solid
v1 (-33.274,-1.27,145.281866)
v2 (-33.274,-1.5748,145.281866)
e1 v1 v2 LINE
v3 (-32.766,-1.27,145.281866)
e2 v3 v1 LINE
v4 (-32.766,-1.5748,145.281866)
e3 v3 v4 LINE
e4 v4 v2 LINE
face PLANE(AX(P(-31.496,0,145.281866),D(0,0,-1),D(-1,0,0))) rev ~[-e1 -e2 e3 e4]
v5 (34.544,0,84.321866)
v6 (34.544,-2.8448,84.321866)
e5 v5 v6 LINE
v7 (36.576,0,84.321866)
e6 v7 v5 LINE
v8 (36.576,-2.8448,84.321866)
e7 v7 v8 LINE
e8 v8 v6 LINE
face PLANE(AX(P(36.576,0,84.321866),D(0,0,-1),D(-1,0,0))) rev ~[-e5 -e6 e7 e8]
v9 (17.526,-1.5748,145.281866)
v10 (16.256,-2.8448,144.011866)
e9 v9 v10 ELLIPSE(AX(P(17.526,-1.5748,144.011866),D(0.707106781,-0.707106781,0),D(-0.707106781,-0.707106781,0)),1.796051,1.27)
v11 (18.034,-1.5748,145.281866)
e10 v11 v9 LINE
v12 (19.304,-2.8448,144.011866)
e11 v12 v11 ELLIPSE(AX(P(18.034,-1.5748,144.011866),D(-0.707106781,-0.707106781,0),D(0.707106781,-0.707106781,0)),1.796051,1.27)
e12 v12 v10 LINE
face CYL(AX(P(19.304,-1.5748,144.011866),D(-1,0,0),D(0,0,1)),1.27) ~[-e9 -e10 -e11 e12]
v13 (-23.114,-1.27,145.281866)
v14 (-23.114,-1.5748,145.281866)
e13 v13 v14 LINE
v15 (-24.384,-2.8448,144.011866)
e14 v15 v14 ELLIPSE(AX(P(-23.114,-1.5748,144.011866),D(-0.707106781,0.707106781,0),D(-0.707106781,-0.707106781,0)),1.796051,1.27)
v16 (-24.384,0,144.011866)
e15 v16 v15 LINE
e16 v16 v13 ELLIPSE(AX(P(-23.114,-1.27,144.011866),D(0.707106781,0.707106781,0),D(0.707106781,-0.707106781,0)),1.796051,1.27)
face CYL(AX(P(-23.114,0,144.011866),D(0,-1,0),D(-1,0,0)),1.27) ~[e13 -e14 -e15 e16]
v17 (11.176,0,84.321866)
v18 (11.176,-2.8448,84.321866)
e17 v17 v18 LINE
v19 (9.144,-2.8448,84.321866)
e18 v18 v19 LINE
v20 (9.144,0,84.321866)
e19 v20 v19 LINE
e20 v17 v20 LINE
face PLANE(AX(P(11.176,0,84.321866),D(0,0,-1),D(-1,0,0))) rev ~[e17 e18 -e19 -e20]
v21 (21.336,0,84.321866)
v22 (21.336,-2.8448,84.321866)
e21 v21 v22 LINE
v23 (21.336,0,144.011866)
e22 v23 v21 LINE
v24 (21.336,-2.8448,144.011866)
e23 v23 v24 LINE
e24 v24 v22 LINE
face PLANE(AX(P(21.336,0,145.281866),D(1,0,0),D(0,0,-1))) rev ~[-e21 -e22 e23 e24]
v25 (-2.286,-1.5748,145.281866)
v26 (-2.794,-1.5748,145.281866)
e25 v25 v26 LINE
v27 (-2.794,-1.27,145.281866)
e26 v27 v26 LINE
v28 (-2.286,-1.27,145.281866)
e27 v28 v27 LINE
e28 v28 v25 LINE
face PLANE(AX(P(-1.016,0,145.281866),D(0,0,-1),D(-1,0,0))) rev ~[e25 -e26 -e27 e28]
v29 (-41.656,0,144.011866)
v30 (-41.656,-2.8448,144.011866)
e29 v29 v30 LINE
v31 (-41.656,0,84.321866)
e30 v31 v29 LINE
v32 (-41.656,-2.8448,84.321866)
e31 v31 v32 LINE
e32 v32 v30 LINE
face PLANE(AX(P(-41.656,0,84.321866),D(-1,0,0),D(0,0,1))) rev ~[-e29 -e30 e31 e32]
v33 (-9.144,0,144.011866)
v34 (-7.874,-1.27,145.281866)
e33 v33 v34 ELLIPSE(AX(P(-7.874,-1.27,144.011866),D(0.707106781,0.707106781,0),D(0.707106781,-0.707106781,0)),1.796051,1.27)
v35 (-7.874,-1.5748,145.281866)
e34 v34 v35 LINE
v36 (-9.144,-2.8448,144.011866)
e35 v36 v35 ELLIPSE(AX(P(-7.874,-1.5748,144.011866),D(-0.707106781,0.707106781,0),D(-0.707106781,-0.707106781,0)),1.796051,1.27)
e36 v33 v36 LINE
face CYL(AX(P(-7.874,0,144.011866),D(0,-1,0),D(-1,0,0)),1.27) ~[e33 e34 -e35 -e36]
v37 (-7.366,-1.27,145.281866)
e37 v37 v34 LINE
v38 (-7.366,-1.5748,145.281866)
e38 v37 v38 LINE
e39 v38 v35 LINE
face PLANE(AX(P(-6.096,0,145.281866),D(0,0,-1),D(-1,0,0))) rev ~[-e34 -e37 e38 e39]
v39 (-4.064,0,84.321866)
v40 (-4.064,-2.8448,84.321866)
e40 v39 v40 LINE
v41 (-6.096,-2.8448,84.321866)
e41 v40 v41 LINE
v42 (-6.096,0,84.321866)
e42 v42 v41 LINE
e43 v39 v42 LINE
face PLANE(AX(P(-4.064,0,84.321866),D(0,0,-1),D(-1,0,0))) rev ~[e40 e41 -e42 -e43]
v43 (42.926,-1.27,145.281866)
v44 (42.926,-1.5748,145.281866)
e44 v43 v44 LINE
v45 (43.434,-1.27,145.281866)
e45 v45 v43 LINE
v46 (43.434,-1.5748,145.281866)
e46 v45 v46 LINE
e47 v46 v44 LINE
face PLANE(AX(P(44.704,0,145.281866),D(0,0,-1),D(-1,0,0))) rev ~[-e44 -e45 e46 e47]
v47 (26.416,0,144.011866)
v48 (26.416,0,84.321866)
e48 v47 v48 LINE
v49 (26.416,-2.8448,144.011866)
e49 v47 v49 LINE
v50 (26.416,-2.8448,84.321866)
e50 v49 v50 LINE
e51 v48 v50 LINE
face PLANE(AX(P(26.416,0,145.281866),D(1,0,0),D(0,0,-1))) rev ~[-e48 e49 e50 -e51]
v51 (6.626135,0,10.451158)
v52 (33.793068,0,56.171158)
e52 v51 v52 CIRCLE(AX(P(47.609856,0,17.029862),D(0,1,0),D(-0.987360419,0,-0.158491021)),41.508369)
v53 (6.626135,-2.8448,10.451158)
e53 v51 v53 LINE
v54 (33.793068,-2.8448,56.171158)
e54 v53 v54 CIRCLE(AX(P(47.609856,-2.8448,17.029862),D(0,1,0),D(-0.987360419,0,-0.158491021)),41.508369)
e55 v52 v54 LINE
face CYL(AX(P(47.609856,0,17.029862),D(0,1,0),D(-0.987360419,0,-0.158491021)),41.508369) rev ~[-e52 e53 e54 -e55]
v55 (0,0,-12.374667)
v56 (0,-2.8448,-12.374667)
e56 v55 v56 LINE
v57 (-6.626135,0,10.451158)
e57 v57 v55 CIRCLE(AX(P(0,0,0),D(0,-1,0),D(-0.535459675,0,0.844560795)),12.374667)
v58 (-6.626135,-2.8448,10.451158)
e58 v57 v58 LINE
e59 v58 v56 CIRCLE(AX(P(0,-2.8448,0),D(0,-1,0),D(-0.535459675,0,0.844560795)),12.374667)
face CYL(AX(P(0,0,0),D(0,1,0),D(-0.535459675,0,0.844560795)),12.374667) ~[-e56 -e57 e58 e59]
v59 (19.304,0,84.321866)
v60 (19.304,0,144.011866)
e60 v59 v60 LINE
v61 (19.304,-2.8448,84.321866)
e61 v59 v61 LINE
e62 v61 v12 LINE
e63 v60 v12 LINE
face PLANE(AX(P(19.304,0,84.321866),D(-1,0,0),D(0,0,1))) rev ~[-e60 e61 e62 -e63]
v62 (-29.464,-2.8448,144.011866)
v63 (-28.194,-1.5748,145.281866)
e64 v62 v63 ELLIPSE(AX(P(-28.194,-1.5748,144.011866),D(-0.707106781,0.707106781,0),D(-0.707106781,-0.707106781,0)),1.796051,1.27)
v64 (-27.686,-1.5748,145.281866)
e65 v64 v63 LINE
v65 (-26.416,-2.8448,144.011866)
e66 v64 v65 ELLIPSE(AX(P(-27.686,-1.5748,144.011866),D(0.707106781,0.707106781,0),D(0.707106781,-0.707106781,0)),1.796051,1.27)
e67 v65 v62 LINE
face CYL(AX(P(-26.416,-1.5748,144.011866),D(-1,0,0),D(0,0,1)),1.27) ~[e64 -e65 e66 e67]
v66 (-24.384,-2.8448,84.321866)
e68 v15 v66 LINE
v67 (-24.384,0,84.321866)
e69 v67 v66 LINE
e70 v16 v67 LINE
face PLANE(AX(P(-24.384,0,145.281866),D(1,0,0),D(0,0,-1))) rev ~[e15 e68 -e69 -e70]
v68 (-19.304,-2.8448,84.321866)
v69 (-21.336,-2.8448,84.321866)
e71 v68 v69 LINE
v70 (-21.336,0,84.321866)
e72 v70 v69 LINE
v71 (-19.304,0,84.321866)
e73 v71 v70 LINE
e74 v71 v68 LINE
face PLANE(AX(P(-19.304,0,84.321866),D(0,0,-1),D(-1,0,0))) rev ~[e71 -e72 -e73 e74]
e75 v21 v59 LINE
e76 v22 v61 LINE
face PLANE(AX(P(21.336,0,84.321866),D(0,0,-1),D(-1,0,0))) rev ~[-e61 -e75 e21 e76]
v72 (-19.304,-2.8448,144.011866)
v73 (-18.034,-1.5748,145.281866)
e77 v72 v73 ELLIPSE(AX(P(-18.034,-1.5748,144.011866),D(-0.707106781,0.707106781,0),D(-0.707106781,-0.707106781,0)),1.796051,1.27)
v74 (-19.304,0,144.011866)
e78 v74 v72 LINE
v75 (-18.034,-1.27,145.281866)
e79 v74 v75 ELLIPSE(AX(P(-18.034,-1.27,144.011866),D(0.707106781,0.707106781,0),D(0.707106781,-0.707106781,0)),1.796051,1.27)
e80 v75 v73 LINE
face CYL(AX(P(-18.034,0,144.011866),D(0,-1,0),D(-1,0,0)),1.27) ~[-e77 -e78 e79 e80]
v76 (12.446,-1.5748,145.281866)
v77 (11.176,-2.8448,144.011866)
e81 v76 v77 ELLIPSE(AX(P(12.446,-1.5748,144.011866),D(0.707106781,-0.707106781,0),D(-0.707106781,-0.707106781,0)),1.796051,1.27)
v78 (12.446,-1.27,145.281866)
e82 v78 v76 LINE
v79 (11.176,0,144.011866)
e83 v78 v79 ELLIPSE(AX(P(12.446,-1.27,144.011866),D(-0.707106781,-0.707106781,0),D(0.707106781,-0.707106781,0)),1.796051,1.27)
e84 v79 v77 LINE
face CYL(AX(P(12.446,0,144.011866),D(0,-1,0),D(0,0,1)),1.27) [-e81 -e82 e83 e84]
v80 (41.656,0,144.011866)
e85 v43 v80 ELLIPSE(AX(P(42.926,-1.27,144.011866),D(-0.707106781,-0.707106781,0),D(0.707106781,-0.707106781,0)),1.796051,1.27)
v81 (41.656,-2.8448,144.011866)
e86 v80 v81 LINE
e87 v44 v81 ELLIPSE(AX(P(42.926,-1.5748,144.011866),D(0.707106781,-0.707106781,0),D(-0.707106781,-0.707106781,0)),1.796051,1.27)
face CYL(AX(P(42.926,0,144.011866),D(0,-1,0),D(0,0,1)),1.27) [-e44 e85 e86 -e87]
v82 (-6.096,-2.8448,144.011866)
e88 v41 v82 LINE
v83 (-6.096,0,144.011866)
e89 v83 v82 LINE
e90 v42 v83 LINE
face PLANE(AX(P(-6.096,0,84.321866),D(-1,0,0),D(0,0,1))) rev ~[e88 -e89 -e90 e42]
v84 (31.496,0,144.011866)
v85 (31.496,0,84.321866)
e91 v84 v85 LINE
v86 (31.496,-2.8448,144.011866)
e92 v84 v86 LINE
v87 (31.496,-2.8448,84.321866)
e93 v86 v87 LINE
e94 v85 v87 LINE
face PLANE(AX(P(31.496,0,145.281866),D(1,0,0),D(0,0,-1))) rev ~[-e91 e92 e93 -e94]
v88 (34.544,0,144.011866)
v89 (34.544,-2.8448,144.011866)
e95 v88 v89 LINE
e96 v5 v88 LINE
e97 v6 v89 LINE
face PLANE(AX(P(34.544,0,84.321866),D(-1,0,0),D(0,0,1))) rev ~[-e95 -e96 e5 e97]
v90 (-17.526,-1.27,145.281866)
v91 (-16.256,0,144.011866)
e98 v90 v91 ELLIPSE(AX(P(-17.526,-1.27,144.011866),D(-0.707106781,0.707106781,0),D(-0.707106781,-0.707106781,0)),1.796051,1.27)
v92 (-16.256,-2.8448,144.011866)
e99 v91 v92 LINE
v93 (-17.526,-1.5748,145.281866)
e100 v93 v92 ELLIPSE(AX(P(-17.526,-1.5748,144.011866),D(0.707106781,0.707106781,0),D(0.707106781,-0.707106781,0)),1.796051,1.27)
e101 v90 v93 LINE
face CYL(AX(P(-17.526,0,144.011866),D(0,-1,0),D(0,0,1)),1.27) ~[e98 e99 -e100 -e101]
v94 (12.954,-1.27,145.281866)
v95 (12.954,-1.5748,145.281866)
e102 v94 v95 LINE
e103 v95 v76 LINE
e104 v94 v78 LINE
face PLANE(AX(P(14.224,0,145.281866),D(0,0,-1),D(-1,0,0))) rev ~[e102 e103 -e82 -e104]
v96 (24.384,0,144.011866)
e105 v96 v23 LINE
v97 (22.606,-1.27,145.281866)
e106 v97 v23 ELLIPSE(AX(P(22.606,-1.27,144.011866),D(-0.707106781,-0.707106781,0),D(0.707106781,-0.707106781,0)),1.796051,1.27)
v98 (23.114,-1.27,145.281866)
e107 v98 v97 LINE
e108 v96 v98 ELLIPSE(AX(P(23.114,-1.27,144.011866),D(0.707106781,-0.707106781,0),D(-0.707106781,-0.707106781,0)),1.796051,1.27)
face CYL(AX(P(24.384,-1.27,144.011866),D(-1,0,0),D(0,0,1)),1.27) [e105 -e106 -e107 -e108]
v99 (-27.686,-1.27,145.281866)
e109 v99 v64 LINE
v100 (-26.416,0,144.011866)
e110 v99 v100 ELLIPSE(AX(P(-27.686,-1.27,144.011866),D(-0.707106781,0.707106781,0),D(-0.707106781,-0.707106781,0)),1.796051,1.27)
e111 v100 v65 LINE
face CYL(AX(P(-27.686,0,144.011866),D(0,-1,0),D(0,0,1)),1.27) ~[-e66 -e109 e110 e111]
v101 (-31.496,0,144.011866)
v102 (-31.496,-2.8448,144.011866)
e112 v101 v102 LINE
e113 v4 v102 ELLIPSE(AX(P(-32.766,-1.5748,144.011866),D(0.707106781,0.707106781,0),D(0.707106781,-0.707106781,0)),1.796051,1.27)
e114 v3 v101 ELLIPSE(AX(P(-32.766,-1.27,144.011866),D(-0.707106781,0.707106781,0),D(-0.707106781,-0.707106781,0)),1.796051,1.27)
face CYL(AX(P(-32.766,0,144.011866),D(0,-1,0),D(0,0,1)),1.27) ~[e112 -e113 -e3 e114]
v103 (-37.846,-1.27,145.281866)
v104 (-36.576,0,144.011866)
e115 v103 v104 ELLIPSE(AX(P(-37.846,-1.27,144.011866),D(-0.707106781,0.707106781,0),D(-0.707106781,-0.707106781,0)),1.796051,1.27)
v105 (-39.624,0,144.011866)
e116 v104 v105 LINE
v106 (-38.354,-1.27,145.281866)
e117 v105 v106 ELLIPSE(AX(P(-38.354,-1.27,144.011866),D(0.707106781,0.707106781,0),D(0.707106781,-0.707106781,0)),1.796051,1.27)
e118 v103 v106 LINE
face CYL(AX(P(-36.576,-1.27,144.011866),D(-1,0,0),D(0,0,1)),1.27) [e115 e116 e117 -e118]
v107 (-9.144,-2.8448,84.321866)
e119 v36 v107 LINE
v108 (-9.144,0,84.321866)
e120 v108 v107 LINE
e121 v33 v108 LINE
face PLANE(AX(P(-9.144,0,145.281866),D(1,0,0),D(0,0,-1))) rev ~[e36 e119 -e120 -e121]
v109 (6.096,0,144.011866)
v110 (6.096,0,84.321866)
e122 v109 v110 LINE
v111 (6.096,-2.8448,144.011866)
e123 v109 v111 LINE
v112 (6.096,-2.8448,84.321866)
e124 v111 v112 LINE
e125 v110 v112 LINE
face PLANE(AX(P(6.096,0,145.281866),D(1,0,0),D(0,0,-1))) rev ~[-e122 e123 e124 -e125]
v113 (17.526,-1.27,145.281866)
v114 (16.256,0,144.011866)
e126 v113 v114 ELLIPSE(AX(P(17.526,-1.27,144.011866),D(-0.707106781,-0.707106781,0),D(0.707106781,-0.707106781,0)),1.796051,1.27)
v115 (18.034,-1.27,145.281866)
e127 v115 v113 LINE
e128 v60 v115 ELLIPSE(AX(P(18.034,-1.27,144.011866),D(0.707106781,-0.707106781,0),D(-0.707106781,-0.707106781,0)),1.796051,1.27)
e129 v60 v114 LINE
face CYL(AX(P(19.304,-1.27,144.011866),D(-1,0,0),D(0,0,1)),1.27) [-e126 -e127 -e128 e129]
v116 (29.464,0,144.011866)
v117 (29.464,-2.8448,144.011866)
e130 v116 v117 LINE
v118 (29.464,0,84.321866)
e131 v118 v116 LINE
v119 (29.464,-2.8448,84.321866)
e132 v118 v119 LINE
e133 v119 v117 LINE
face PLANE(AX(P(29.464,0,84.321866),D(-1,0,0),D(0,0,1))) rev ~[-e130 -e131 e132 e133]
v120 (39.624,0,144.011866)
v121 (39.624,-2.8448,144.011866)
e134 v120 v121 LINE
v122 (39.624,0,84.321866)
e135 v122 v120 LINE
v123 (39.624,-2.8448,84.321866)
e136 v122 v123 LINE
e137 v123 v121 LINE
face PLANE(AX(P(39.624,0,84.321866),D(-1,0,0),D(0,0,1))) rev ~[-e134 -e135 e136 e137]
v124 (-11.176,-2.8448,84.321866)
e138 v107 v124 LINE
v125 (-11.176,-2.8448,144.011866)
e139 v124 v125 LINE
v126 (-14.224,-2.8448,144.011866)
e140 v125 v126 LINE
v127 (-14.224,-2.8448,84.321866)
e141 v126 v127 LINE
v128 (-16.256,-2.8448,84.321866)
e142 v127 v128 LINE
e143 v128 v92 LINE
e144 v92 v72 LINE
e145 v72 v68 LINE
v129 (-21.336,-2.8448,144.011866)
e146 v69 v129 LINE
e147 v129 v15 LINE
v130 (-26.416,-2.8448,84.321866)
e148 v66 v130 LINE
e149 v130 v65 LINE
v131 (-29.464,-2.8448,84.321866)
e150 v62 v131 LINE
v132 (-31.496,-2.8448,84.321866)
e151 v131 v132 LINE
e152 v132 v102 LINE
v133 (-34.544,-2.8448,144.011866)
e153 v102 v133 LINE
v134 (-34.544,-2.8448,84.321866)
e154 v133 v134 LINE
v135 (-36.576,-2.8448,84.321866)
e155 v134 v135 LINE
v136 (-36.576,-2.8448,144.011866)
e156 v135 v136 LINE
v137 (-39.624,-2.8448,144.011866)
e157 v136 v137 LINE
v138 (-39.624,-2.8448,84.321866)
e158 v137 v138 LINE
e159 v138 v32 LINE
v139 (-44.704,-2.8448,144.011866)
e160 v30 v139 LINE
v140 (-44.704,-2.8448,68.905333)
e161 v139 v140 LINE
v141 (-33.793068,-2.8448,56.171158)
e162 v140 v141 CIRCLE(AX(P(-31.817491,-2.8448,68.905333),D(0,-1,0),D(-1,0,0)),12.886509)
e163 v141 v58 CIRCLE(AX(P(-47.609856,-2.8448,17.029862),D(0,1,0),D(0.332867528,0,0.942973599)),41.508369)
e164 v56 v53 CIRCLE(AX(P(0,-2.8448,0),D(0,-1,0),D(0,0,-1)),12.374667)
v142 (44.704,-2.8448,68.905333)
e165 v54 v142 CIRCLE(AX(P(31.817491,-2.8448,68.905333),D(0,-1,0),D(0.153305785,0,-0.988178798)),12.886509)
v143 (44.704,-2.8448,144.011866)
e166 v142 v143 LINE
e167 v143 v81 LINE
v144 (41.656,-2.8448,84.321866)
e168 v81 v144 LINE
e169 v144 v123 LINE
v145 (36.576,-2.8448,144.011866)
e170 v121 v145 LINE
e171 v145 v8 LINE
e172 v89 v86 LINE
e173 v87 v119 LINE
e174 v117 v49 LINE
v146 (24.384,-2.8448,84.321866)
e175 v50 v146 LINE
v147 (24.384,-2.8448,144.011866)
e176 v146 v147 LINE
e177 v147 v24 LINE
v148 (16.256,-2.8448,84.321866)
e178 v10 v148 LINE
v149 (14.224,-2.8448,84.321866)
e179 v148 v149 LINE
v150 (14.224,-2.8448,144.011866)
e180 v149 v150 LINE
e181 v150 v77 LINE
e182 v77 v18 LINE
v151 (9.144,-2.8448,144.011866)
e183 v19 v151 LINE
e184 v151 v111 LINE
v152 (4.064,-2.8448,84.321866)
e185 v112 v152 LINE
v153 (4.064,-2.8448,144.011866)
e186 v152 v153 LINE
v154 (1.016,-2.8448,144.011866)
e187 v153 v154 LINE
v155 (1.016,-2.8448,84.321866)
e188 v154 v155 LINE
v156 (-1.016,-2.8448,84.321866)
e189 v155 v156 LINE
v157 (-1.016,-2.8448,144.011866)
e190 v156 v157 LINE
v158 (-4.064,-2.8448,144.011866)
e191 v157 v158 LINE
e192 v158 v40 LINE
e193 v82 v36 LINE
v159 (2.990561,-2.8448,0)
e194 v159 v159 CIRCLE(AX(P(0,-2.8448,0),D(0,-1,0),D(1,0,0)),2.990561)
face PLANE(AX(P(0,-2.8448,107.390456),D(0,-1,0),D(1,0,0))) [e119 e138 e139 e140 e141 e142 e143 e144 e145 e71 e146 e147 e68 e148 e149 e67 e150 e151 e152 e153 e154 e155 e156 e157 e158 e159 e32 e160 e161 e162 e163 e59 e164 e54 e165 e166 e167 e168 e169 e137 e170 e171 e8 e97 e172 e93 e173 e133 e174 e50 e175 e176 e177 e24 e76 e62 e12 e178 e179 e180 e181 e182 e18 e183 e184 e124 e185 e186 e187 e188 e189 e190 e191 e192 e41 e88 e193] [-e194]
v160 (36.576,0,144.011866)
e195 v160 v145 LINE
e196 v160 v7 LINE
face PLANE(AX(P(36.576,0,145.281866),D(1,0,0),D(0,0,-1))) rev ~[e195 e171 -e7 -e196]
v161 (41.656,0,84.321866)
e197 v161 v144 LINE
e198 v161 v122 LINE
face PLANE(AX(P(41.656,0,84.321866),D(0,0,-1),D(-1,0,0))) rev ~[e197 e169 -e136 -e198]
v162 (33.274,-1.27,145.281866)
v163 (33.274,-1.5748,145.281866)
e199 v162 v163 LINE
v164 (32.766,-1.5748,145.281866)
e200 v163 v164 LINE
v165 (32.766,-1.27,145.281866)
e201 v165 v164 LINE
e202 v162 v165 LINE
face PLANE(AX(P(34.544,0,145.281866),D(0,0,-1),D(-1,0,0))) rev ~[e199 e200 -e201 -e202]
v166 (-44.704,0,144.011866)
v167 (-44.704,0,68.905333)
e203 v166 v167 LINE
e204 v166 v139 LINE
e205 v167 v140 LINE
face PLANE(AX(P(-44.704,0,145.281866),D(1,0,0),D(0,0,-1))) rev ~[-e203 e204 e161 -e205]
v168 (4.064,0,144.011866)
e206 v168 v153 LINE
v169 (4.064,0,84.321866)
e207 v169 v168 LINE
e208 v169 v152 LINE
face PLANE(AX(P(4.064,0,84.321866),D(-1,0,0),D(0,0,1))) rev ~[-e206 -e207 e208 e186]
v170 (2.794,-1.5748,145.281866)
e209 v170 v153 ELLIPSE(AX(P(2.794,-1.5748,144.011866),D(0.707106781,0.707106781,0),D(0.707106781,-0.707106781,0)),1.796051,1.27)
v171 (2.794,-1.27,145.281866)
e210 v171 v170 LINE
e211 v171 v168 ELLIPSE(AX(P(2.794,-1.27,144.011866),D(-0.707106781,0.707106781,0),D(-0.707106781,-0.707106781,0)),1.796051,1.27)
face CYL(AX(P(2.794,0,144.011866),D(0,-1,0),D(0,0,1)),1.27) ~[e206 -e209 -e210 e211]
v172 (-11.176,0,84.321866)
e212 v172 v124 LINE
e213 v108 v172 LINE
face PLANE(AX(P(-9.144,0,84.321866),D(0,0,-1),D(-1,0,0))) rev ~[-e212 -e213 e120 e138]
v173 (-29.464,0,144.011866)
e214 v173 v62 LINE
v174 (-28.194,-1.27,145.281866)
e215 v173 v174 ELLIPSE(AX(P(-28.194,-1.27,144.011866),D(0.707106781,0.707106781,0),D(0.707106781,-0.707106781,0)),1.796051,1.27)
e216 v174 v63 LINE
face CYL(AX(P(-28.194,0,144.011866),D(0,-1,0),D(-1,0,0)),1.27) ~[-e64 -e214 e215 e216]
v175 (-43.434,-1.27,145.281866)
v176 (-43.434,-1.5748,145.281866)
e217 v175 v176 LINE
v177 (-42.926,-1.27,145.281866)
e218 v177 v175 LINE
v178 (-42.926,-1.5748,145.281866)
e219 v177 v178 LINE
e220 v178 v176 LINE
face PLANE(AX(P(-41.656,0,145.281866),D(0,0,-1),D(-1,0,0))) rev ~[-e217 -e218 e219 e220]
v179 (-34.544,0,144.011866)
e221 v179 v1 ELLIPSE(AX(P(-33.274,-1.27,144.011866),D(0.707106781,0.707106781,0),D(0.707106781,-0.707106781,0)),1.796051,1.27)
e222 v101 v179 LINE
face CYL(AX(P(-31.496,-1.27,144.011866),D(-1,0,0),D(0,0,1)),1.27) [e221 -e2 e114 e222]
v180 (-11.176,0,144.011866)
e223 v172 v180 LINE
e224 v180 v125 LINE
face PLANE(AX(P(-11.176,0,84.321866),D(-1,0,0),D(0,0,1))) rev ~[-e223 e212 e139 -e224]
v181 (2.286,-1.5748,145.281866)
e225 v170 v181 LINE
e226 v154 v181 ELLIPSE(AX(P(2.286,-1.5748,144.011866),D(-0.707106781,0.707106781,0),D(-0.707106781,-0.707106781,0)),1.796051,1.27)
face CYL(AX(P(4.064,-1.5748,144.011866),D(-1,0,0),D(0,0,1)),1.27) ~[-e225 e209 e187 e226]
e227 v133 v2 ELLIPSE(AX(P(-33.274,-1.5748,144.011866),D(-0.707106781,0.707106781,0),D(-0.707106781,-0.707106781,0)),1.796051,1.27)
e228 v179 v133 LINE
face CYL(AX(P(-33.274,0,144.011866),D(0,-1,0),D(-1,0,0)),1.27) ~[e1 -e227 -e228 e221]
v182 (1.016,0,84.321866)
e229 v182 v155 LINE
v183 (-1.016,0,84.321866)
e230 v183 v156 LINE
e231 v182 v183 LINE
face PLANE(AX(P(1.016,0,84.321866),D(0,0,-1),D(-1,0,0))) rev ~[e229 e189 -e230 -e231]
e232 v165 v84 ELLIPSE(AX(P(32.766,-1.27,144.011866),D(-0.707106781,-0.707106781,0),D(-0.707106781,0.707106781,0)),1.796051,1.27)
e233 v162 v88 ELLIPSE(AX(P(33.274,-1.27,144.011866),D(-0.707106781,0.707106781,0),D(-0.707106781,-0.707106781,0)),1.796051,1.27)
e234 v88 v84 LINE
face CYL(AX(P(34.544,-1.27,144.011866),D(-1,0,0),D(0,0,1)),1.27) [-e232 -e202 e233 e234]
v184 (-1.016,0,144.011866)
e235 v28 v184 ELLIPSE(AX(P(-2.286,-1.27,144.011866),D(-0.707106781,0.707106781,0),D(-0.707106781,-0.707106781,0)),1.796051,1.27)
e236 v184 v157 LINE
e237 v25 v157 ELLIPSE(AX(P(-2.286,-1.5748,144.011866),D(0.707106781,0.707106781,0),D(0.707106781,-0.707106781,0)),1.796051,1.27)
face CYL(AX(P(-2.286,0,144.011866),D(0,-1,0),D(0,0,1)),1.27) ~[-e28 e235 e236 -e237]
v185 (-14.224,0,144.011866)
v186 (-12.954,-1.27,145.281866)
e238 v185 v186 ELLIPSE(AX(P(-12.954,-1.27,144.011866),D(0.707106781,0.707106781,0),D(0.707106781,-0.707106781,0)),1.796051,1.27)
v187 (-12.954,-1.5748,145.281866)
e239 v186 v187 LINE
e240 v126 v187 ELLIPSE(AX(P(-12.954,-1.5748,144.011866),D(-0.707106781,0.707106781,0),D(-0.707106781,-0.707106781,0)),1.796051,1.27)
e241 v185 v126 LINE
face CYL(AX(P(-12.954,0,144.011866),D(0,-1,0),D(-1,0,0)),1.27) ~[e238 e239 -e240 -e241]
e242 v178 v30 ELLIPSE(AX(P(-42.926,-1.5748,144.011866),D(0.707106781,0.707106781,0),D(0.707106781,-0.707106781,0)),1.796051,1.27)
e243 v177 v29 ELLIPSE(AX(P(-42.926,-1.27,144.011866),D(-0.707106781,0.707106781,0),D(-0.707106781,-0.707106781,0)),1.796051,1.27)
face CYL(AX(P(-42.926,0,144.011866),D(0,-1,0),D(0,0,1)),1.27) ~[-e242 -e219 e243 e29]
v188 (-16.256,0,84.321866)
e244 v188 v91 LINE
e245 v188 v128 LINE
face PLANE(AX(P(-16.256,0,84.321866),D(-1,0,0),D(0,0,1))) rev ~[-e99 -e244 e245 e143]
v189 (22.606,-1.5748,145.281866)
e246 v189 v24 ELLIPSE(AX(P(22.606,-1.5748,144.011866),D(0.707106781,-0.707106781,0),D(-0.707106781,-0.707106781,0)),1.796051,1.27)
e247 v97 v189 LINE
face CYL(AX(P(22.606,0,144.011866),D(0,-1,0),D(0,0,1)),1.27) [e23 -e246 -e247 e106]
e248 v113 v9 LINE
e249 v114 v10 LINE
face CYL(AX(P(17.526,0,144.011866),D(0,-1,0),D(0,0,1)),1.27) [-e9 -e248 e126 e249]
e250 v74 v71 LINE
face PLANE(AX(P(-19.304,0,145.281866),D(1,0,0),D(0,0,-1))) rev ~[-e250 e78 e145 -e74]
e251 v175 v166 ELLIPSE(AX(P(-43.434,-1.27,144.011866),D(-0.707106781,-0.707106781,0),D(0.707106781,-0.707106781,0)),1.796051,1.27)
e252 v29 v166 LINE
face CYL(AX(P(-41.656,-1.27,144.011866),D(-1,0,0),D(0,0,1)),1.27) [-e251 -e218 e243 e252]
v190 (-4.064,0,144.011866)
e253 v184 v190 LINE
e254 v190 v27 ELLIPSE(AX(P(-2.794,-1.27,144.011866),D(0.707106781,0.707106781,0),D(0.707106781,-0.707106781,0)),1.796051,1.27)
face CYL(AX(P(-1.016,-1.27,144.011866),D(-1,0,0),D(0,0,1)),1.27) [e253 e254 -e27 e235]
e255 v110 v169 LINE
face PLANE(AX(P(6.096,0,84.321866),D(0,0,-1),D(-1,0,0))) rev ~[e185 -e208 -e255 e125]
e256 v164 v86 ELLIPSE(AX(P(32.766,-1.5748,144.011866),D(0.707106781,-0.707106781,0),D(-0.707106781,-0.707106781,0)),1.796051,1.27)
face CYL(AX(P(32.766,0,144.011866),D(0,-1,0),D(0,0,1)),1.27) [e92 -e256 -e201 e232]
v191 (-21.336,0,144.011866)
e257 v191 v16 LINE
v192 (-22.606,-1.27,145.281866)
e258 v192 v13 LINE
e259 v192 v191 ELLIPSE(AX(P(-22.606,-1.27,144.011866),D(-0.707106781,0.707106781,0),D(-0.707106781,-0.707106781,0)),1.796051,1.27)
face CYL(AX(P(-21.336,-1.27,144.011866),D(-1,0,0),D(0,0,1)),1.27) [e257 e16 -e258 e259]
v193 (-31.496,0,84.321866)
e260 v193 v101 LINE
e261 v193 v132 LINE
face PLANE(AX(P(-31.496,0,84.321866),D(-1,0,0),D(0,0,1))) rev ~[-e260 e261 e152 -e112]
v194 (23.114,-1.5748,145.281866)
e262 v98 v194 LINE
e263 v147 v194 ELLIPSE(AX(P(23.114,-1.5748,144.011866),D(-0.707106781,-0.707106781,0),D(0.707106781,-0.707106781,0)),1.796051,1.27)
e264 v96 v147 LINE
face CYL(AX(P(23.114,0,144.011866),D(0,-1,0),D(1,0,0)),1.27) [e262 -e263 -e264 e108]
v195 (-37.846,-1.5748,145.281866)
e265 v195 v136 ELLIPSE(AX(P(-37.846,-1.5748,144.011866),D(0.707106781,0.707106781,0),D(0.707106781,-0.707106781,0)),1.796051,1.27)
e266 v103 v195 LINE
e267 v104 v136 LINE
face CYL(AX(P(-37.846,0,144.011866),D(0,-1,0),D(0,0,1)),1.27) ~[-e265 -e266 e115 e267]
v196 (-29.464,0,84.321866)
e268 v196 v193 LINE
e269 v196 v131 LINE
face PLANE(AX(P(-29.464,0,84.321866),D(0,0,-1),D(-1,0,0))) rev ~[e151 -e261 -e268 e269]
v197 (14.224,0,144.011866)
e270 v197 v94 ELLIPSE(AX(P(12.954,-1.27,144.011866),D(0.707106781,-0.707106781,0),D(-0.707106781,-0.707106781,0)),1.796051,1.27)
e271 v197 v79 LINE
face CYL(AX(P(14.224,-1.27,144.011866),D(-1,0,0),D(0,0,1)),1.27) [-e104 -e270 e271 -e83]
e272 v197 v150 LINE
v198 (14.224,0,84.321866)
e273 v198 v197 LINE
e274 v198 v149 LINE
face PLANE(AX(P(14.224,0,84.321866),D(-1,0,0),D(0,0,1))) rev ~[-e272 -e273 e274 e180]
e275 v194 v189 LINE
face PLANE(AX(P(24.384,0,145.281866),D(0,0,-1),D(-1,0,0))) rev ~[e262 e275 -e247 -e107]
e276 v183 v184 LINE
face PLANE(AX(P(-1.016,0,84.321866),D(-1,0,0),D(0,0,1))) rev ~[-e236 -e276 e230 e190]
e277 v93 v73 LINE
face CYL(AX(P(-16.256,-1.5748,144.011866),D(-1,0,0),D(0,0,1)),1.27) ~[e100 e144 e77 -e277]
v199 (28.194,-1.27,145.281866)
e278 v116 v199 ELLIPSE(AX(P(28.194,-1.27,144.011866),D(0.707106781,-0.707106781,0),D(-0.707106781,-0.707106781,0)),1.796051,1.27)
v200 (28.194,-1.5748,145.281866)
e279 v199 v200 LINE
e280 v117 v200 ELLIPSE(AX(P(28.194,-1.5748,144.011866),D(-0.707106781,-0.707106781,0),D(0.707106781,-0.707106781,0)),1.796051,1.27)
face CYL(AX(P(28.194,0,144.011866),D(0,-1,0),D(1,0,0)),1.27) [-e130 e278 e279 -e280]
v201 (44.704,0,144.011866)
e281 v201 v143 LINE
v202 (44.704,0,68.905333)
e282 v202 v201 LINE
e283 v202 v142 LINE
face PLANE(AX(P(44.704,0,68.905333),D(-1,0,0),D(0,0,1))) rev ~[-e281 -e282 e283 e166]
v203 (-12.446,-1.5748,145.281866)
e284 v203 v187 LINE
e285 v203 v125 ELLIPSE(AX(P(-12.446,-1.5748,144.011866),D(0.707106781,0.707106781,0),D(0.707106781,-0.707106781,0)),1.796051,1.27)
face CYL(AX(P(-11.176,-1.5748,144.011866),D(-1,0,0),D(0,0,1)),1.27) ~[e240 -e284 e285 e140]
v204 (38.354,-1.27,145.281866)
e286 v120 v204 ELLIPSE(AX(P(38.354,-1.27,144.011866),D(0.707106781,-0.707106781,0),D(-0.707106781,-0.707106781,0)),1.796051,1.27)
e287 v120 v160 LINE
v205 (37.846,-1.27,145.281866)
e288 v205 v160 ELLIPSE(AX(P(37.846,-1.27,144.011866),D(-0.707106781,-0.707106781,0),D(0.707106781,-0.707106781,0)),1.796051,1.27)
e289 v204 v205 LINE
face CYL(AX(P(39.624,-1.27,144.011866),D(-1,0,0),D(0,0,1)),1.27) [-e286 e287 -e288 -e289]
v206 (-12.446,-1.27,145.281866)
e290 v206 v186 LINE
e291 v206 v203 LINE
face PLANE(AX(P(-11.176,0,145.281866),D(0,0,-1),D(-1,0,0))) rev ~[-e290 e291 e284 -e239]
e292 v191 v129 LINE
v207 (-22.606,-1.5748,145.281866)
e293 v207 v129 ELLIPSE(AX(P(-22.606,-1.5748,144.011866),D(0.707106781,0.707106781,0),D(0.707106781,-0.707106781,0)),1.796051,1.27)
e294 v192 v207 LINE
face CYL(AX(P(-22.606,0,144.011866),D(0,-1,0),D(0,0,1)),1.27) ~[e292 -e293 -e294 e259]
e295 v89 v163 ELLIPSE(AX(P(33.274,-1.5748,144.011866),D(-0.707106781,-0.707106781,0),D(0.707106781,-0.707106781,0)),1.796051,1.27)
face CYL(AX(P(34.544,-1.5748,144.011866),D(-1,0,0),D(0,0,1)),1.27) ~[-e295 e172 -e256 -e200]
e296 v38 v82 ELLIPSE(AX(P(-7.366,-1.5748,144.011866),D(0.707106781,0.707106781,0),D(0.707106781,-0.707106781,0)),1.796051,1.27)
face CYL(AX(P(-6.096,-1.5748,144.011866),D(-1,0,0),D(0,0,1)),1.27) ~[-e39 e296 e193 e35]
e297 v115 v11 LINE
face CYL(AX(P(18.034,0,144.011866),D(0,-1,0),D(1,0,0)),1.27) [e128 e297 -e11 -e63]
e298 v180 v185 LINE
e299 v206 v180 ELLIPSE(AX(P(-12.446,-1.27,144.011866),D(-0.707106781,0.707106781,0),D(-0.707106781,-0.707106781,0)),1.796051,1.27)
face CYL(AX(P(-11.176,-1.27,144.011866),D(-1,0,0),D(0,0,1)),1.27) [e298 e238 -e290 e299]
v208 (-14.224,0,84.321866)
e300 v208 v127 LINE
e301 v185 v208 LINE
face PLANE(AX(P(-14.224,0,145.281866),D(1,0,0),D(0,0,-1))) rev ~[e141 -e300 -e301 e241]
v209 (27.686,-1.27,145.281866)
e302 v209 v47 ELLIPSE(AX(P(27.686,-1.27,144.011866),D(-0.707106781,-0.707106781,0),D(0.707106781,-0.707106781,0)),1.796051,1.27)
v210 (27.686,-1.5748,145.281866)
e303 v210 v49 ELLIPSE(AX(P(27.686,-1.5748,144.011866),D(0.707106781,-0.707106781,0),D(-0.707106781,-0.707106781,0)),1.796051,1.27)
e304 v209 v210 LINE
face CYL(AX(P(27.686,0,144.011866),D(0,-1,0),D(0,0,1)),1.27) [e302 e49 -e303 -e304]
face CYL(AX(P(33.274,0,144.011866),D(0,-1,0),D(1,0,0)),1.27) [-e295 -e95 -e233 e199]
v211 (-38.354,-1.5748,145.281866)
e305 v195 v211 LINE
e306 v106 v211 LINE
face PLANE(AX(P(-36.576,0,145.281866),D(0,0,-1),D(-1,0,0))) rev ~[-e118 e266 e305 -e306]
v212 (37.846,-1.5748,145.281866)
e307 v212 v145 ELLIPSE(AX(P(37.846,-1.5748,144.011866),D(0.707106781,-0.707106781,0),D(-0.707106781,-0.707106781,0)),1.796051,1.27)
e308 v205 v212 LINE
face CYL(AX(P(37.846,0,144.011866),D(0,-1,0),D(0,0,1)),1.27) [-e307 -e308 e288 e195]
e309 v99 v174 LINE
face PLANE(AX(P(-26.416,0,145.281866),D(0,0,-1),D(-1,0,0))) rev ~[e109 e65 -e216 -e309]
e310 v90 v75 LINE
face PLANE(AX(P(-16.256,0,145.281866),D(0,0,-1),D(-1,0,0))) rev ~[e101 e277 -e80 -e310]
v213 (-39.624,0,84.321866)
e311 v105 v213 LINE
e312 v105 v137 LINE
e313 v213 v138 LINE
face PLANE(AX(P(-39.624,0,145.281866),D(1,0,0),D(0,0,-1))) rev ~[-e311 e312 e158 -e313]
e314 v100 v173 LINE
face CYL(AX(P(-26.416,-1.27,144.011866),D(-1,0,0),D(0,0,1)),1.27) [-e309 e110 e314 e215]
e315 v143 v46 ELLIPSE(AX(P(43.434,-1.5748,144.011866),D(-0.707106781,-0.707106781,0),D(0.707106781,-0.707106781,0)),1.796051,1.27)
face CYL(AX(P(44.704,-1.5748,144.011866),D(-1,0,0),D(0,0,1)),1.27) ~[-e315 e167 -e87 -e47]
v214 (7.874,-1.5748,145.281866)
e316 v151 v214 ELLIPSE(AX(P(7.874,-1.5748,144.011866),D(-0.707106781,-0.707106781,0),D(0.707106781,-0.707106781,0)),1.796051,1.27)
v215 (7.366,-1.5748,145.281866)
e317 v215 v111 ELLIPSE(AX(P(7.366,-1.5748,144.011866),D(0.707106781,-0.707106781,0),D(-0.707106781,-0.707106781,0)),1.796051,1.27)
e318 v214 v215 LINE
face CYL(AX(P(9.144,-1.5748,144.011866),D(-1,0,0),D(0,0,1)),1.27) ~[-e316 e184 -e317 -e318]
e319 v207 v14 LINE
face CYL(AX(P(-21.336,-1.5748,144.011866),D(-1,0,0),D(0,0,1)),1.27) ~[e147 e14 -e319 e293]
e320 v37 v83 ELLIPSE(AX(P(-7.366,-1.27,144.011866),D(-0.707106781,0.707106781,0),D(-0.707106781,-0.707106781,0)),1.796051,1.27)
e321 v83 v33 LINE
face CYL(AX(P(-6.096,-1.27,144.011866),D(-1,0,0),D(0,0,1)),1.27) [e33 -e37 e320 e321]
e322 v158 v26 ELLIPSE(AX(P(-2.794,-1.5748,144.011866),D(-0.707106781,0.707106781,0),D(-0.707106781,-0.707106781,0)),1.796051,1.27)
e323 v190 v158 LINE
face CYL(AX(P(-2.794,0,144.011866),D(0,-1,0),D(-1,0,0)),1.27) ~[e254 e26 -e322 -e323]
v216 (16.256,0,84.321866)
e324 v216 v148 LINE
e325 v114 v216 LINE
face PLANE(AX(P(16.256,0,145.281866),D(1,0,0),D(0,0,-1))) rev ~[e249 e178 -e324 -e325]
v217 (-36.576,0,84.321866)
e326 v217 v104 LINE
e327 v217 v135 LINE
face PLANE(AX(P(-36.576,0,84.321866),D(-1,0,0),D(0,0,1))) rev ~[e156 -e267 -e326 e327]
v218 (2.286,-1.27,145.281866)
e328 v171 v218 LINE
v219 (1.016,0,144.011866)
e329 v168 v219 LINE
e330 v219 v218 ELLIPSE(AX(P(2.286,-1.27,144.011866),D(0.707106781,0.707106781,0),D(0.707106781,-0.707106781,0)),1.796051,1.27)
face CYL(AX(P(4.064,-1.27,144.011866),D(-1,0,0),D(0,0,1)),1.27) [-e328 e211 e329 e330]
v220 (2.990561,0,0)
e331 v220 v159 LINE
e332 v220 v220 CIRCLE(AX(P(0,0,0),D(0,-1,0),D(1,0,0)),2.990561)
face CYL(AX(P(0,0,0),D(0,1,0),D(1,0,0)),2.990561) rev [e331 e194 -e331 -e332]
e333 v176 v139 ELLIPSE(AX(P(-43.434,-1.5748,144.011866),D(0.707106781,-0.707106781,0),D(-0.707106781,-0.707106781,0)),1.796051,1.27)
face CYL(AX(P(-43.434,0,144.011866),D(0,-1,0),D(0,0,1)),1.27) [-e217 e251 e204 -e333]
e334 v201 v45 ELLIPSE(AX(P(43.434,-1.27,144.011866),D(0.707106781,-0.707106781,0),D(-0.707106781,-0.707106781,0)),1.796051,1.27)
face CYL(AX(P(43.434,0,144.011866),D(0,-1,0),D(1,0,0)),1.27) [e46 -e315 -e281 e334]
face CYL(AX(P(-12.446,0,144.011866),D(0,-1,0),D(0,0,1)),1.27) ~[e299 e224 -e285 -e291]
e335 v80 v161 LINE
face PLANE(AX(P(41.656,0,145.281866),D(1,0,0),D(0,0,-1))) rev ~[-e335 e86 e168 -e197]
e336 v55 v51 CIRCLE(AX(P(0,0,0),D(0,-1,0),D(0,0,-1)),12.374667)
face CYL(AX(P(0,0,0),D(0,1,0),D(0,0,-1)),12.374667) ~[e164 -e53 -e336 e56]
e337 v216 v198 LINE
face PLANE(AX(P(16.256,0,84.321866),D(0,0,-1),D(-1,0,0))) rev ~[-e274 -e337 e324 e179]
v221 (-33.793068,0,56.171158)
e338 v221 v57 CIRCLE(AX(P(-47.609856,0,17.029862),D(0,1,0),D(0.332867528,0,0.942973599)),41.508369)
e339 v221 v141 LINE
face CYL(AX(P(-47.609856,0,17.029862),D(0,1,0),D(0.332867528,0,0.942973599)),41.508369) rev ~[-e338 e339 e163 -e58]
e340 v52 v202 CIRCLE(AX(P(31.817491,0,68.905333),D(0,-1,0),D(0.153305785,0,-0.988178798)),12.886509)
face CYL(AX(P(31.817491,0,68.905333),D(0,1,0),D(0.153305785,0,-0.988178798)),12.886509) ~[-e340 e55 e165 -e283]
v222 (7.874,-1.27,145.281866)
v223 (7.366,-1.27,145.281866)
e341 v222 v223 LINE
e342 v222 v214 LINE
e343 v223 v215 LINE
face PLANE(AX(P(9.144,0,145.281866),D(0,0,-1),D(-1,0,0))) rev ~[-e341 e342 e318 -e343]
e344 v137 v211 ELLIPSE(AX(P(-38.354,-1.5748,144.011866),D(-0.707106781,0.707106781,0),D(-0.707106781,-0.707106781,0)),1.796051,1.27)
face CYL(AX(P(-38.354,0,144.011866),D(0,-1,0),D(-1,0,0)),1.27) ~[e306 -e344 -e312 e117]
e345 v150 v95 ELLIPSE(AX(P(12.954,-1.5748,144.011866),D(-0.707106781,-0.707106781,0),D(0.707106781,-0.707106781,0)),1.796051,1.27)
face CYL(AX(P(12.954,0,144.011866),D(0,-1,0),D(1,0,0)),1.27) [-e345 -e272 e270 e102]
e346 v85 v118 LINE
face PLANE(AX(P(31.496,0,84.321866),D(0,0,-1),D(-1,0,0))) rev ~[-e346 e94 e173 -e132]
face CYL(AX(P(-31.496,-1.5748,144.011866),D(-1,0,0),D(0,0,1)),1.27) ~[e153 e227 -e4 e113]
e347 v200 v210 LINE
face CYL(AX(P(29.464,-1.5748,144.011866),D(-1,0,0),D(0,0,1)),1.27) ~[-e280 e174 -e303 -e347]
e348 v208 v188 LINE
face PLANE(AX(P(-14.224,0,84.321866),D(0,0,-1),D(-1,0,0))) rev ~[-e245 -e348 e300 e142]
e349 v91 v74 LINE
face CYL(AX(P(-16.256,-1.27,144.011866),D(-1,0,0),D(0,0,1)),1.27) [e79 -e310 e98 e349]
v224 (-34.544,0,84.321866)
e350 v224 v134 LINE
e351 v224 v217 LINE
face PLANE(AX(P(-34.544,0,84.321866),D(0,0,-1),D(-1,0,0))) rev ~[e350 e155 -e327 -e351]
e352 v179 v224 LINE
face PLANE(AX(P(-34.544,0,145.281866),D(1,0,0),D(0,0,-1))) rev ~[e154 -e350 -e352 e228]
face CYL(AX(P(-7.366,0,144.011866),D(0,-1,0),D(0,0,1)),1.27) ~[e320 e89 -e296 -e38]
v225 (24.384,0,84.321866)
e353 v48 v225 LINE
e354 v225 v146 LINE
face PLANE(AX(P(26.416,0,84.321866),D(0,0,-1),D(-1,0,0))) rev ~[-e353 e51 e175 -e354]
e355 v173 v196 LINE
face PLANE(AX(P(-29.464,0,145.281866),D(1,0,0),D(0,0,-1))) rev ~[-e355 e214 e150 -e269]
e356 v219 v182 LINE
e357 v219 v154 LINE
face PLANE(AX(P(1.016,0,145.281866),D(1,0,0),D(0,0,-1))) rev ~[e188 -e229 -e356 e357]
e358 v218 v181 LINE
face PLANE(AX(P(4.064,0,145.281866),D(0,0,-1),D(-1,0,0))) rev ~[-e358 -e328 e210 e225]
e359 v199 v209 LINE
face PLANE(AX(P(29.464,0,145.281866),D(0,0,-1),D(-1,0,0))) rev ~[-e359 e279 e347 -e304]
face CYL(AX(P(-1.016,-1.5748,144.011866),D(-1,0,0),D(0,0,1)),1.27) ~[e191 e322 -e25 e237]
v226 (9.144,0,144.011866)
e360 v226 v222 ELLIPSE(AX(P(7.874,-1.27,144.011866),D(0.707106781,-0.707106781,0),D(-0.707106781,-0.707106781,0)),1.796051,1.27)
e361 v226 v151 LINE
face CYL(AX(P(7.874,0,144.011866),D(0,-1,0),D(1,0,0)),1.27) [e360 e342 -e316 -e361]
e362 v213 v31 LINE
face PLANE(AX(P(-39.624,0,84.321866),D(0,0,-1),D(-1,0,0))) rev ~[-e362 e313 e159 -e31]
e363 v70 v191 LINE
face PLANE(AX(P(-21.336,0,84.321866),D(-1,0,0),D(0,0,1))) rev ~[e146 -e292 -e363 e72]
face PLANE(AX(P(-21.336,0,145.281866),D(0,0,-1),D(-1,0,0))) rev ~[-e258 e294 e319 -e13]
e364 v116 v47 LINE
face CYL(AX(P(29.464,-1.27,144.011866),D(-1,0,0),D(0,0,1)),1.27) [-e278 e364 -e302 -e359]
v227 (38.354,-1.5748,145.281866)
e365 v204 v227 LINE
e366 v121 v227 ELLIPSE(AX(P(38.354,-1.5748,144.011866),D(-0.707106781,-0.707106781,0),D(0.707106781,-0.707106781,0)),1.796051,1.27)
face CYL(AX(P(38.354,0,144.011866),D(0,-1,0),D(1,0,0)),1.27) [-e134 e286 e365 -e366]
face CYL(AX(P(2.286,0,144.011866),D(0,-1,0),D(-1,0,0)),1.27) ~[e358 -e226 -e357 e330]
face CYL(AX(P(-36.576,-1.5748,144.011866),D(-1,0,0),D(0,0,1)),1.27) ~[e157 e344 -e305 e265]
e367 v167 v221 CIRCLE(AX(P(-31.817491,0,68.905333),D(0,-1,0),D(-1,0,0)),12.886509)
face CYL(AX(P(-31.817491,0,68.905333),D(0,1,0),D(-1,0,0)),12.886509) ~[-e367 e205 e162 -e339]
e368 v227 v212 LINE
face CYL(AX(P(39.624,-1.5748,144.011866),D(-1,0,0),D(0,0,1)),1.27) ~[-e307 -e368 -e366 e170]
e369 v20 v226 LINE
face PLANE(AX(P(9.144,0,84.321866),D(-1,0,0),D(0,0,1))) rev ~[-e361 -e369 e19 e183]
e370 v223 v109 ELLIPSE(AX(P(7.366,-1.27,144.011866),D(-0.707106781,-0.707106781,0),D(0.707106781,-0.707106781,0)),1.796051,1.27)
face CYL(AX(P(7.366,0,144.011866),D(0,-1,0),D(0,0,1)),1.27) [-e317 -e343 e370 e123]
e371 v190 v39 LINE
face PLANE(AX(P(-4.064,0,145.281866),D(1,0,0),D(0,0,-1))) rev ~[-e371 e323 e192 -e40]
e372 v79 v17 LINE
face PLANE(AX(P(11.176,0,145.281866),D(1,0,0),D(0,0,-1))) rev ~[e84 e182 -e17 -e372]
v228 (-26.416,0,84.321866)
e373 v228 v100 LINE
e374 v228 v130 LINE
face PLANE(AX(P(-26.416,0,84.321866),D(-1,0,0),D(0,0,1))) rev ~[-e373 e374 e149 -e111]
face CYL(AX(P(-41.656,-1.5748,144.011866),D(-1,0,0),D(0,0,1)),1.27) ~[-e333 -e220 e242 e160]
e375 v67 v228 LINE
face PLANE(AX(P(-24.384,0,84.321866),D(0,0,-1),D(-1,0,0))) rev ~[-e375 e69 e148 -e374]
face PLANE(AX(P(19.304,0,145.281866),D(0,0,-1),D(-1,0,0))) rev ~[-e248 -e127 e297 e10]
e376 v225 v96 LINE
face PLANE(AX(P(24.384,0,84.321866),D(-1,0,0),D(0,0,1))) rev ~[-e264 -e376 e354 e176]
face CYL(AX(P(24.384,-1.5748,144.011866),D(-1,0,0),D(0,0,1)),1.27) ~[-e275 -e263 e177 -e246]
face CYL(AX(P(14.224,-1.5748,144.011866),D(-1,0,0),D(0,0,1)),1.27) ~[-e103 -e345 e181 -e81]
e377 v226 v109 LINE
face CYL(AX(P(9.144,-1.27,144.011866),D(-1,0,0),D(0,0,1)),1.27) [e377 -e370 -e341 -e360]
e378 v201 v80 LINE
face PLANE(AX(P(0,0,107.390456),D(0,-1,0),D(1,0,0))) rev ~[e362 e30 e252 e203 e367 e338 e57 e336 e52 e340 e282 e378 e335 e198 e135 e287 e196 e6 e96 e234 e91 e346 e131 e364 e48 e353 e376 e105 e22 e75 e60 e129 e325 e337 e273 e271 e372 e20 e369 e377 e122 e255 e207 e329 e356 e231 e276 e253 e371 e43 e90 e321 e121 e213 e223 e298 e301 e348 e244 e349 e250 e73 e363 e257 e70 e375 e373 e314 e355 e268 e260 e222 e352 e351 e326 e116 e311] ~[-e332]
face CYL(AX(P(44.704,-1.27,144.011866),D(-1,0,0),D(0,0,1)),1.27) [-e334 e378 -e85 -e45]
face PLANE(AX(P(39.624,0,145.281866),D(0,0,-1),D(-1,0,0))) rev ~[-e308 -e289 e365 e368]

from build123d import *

# Parameters (mm, degrees)
F0_R     = 3.7382012242
F1_DEPTH = 3.556
F3_SCALE = 0.8
F4_R     = 1.27


with BuildPart() as f1:
    # F0 (on Front) → F1 (new body)
    with BuildSketch(Plane.XZ):
        with BuildLine():
            Line((-52.07, 181.6023319495), (-55.88, 181.6023319495))
            Line((-55.88, 181.6023319495), (-55.88, 86.1316665151))
            ThreePointArc((-55.88, 86.1316665151), (-52.0040063032, 75.6508869522), (-42.2413344101, 70.2139480257))
            ThreePointArc((-42.2413344101, 70.2139480257), (-14.9072200491, 47.7917837992), (-8.2826688201, 13.0639480257))
            ThreePointArc((-8.2826688201, 13.0639480257), (-14.8550807048, -4.3122984655), (0, -15.4683334849))
            ThreePointArc((0, -15.4683334849), (14.8550807048, -4.3122984655), (8.2826688201, 13.0639480257))
            ThreePointArc((8.2826688201, 13.0639480257), (14.9072200491, 47.7917837992), (42.2413344101, 70.2139480257))
            ThreePointArc((42.2413344101, 70.2139480257), (52.0040063032, 75.6508869522), (55.88, 86.1316665151))
            Line((55.88, 86.1316665151), (55.88, 181.6023319495))
            Line((55.88, 181.6023319495), (52.07, 181.6023319495))
            Line((52.07, 181.6023319495), (52.07, 105.4023319495))
            Line((52.07, 105.4023319495), (49.53, 105.4023319495))
            Line((49.53, 105.4023319495), (49.53, 181.6023319495))
            Line((49.53, 181.6023319495), (45.72, 181.6023319495))
            Line((45.72, 181.6023319495), (45.72, 105.4023319495))
            Line((45.72, 105.4023319495), (43.18, 105.4023319495))
            Line((43.18, 105.4023319495), (43.18, 181.6023319495))
            Line((43.18, 181.6023319495), (39.37, 181.6023319495))
            Line((39.37, 181.6023319495), (39.37, 105.4023319495))
            Line((39.37, 105.4023319495), (36.83, 105.4023319495))
            Line((36.83, 105.4023319495), (36.83, 181.6023319495))
            Line((36.83, 181.6023319495), (33.02, 181.6023319495))
            Line((33.02, 181.6023319495), (33.02, 105.4023319495))
            Line((33.02, 105.4023319495), (30.48, 105.4023319495))
            Line((30.48, 105.4023319495), (30.48, 181.6023319495))
            Line((30.48, 181.6023319495), (26.67, 181.6023319495))
            Line((26.67, 181.6023319495), (26.67, 105.4023319495))
            Line((26.67, 105.4023319495), (24.13, 105.4023319495))
            Line((24.13, 105.4023319495), (24.13, 181.6023319495))
            Line((24.13, 181.6023319495), (20.32, 181.6023319495))
            Line((20.32, 181.6023319495), (20.32, 105.4023319495))
            Line((20.32, 105.4023319495), (17.78, 105.4023319495))
            Line((17.78, 105.4023319495), (17.78, 181.6023319495))
            Line((17.78, 181.6023319495), (13.97, 181.6023319495))
            Line((13.97, 181.6023319495), (13.97, 105.4023319495))
            Line((13.97, 105.4023319495), (11.43, 105.4023319495))
            Line((11.43, 105.4023319495), (11.43, 181.6023319495))
            Line((11.43, 181.6023319495), (7.62, 181.6023319495))
            Line((7.62, 181.6023319495), (7.62, 105.4023319495))
            Line((7.62, 105.4023319495), (5.08, 105.4023319495))
            Line((5.08, 105.4023319495), (5.08, 181.6023319495))
            Line((5.08, 181.6023319495), (1.27, 181.6023319495))
            Line((1.27, 181.6023319495), (1.27, 105.4023319495))
            Line((1.27, 105.4023319495), (-1.27, 105.4023319495))
            Line((-1.27, 105.4023319495), (-1.27, 181.6023319495))
            Line((-1.27, 181.6023319495), (-5.08, 181.6023319495))
            Line((-5.08, 181.6023319495), (-5.08, 105.4023319495))
            Line((-5.08, 105.4023319495), (-7.62, 105.4023319495))
            Line((-7.62, 105.4023319495), (-7.62, 181.6023319495))
            Line((-7.62, 181.6023319495), (-11.43, 181.6023319495))
            Line((-11.43, 181.6023319495), (-11.43, 105.4023319495))
            Line((-11.43, 105.4023319495), (-13.97, 105.4023319495))
            Line((-13.97, 105.4023319495), (-13.97, 181.6023319495))
            Line((-13.97, 181.6023319495), (-17.78, 181.6023319495))
            Line((-17.78, 181.6023319495), (-17.78, 105.4023319495))
            Line((-17.78, 105.4023319495), (-20.32, 105.4023319495))
            Line((-20.32, 105.4023319495), (-20.32, 181.6023319495))
            Line((-20.32, 181.6023319495), (-24.13, 181.6023319495))
            Line((-24.13, 181.6023319495), (-24.13, 105.4023319495))
            Line((-24.13, 105.4023319495), (-26.67, 105.4023319495))
            Line((-26.67, 105.4023319495), (-26.67, 181.6023319495))
            Line((-26.67, 181.6023319495), (-30.48, 181.6023319495))
            Line((-30.48, 181.6023319495), (-30.48, 105.4023319495))
            Line((-30.48, 105.4023319495), (-33.02, 105.4023319495))
            Line((-33.02, 105.4023319495), (-33.02, 181.6023319495))
            Line((-33.02, 181.6023319495), (-36.83, 181.6023319495))
            Line((-36.83, 181.6023319495), (-36.83, 105.4023319495))
            Line((-36.83, 105.4023319495), (-39.37, 105.4023319495))
            Line((-39.37, 105.4023319495), (-39.37, 181.6023319495))
            Line((-39.37, 181.6023319495), (-43.18, 181.6023319495))
            Line((-43.18, 181.6023319495), (-43.18, 105.4023319495))
            Line((-43.18, 105.4023319495), (-45.72, 105.4023319495))
            Line((-45.72, 105.4023319495), (-45.72, 181.6023319495))
            Line((-45.72, 181.6023319495), (-49.53, 181.6023319495))
            Line((-49.53, 181.6023319495), (-49.53, 105.4023319495))
            Line((-49.53, 105.4023319495), (-52.07, 105.4023319495))
            Line((-52.07, 105.4023319495), (-52.07, 181.6023319495))
        make_face()
        Circle(F0_R, mode=Mode.SUBTRACT)
    extrude(amount=F1_DEPTH)


with BuildPart() as f1_1:
    # F3: moved
    add(f1.part.scale(F3_SCALE))

    # F4
    f4_edges = [f1_1.edges().sort_by_distance(p)[0] for p in [
        (33.02, 0, 145.281866),
        (31.496, -1.4224, 145.281866),
        (34.544, -1.4224, 145.281866),
        (39.624, -1.4224, 145.281866),
        (36.576, -1.4224, 145.281866),
        (38.1, 0, 145.281866),
        (38.1, -2.8448, 145.281866),
        (44.704, -1.4224, 145.281866),
        (41.656, -1.4224, 145.281866),
        (43.18, 0, 145.281866),
        (43.18, -2.8448, 145.281866),
        (29.464, -1.4224, 145.281866),
        (26.416, -1.4224, 145.281866),
        (27.94, 0, 145.281866),
        (27.94, -2.8448, 145.281866),
        (24.384, -1.4224, 145.281866),
        (21.336, -1.4224, 145.281866),
        (22.86, 0, 145.281866),
        (22.86, -2.8448, 145.281866),
        (19.304, -1.4224, 145.281866),
        (16.256, -1.4224, 145.281866),
        (17.78, 0, 145.281866),
        (17.78, -2.8448, 145.281866),
        (14.224, -1.4224, 145.281866),
        (11.176, -1.4224, 145.281866),
        (12.7, 0, 145.281866),
        (12.7, -2.8448, 145.281866),
        (9.144, -1.4224, 145.281866),
        (6.096, -1.4224, 145.281866),
        (7.62, 0, 145.281866),
        (7.62, -2.8448, 145.281866),
        (4.064, -1.4224, 145.281866),
        (1.016, -1.4224, 145.281866),
        (2.54, 0, 145.281866),
        (2.54, -2.8448, 145.281866),
        (-1.016, -1.4224, 145.281866),
        (-4.064, -1.4224, 145.281866),
        (-2.54, 0, 145.281866),
        (-2.54, -2.8448, 145.281866),
        (-6.096, -1.4224, 145.281866),
        (-9.144, -1.4224, 145.281866),
        (-7.62, 0, 145.281866),
        (-7.62, -2.8448, 145.281866),
        (-11.176, -1.4224, 145.281866),
        (-14.224, -1.4224, 145.281866),
        (-12.7, 0, 145.281866),
        (-12.7, -2.8448, 145.281866),
        (-16.256, -1.4224, 145.281866),
        (-19.304, -1.4224, 145.281866),
        (-17.78, 0, 145.281866),
        (-17.78, -2.8448, 145.281866),
        (-21.336, -1.4224, 145.281866),
        (-24.384, -1.4224, 145.281866),
        (-22.86, 0, 145.281866),
        (-22.86, -2.8448, 145.281866),
        (-26.416, -1.4224, 145.281866),
        (-29.464, -1.4224, 145.281866),
        (-27.94, 0, 145.281866),
        (-27.94, -2.8448, 145.281866),
        (-31.496, -1.4224, 145.281866),
        (-34.544, -1.4224, 145.281866),
        (-33.02, 0, 145.281866),
        (-33.02, -2.8448, 145.281866),
        (-36.576, -1.4224, 145.281866),
        (-39.624, -1.4224, 145.281866),
        (-38.1, 0, 145.281866),
        (-38.1, -2.8448, 145.281866),
        (-41.656, -1.4224, 145.281866),
        (-44.704, -1.4224, 145.281866),
        (-43.18, 0, 145.281866),
        (-43.18, -2.8448, 145.281866),
        (33.02, -2.8448, 145.281866),
    ]]
    fillet(f4_edges, radius=F4_R)


solid = f1_1.part
